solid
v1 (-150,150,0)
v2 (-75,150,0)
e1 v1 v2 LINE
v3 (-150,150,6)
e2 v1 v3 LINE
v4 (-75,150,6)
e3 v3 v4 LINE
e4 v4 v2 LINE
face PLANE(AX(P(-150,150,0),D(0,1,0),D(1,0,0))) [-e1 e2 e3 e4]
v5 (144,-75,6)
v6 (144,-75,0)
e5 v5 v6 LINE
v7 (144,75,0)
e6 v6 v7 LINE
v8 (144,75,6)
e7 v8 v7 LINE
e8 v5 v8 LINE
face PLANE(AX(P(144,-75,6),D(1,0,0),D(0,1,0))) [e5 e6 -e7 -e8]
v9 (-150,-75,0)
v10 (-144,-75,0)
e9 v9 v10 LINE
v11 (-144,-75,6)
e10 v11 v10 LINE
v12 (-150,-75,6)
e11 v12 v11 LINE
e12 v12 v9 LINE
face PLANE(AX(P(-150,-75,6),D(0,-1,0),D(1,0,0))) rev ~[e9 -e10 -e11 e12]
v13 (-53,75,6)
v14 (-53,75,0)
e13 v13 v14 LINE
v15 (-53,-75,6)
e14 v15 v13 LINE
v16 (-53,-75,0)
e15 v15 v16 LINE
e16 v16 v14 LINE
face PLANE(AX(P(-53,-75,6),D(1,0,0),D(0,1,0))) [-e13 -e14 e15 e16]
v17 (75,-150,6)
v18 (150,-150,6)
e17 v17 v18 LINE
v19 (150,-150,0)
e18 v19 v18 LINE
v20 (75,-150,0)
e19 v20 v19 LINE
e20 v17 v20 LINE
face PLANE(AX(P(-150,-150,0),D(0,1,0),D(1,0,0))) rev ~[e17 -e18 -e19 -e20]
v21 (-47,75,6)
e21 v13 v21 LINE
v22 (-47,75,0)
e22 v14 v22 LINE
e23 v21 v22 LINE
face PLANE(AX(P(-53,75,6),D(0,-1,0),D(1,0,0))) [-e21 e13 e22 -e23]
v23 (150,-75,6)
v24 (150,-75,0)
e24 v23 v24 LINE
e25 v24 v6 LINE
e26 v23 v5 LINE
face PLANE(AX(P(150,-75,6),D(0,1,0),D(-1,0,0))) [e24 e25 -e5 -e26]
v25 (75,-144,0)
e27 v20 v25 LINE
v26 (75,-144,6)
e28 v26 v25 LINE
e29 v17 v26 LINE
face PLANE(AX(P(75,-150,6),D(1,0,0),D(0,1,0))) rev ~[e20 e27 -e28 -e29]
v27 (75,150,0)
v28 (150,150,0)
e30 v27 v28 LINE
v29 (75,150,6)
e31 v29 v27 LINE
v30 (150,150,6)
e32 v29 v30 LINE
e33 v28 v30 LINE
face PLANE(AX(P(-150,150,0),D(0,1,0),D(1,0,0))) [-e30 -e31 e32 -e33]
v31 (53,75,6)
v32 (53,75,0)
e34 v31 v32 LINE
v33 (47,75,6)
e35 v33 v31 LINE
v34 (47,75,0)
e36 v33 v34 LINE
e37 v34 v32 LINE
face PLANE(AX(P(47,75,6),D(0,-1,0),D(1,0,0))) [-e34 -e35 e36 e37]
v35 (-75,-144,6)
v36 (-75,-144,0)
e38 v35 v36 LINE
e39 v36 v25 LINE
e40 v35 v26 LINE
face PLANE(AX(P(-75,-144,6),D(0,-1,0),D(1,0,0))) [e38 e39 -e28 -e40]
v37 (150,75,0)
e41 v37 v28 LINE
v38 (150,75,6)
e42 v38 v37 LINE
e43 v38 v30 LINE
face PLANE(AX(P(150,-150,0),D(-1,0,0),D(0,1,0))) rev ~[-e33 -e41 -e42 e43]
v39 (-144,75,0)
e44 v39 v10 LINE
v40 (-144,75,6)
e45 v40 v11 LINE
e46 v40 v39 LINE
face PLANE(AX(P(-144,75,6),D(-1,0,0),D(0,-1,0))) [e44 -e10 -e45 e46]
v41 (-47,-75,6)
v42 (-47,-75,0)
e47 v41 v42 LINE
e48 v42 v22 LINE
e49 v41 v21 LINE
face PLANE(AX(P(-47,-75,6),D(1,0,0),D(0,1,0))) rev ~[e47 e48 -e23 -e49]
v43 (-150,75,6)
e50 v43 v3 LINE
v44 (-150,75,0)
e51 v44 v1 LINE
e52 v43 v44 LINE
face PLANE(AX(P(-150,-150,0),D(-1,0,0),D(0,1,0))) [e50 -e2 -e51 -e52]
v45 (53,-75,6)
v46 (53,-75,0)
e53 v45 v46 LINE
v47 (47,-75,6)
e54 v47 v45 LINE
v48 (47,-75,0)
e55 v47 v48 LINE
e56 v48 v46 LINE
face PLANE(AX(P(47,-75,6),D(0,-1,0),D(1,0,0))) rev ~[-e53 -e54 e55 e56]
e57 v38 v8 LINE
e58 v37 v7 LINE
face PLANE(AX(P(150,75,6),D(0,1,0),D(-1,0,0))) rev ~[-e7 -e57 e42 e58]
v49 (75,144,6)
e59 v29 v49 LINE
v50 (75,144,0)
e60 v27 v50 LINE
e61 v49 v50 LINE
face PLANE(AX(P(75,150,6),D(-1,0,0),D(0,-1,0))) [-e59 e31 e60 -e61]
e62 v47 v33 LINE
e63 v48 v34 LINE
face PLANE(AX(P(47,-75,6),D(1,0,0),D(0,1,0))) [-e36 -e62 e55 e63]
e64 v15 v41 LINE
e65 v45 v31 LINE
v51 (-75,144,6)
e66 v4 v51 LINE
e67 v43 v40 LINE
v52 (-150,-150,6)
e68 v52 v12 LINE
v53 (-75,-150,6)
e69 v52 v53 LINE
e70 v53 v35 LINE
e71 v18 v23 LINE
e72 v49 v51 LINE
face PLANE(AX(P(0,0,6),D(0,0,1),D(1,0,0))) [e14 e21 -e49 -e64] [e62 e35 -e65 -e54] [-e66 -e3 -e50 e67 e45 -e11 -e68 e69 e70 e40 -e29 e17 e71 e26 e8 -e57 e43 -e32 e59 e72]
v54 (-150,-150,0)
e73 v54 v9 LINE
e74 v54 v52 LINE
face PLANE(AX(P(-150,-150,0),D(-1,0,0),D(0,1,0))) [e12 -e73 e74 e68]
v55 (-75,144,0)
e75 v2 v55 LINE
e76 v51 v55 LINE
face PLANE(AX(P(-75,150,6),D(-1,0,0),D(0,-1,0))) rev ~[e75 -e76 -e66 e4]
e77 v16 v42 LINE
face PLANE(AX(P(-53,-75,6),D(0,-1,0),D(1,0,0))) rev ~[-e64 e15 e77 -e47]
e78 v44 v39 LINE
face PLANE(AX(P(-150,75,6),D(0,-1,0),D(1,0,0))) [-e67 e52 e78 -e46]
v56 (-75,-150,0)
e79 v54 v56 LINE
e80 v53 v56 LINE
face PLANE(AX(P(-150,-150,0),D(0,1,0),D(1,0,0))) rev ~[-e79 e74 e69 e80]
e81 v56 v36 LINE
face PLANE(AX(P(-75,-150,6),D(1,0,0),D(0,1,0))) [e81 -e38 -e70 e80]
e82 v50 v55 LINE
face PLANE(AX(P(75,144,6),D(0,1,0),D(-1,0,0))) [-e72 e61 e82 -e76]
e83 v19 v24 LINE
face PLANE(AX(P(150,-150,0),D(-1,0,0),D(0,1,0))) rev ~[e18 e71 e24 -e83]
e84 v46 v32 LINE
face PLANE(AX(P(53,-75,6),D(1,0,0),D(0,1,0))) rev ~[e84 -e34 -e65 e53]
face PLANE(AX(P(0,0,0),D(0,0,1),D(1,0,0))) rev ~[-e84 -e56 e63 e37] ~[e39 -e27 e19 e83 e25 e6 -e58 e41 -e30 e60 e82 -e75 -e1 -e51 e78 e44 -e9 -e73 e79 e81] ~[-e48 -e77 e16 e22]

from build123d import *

# Parameters (mm, degrees)
F0_W            = 300
F0_H            = 300
F1_DEPTH        = 6
F2_W            = 150
F2_H            = 6
F3_DEPTH        = 6
F3_COPIES_COUNT = 4
F5_W            = 6
F5_H            = 150
F6_DEPTH        = 6


# Not quite as in the source:
# - a pattern or mirror of a feature is missing from the dataset's text; its kind, count and spacing are read off the source's solid


with BuildPart() as f1:
    # F0 (on Top) → F1 (new body)
    with BuildSketch(Plane.XY):
        Rectangle(F0_W, F0_H)
    extrude(amount=F1_DEPTH)

    # F2 (on face) → F3 (cut, through all)
    with BuildSketch(Plane.XY.offset(6)):
        with Locations((0, -147)):
            Rectangle(F2_W, F2_H)
    f3 = extrude(amount=-F3_DEPTH, mode=Mode.SUBTRACT)

    # F3_copies: F3 ×4 about axis
    f3_copies_axis = Axis((0, 0, 0), (0, 0, 1))
    for i in range(1, F3_COPIES_COUNT):
        add(f3.rotate(f3_copies_axis, i * 360 / F3_COPIES_COUNT), mode=Mode.SUBTRACT)

    # F5 (on face) → F6 (cut, through all)
    with BuildSketch(Plane.XY.offset(6)):
        with Locations((-50, 0)):
            Rectangle(F5_W, F5_H)
        with Locations((50, 0)):
            Rectangle(F5_W, F5_H)
    extrude(amount=-F6_DEPTH, mode=Mode.SUBTRACT)


solid = f1.part
